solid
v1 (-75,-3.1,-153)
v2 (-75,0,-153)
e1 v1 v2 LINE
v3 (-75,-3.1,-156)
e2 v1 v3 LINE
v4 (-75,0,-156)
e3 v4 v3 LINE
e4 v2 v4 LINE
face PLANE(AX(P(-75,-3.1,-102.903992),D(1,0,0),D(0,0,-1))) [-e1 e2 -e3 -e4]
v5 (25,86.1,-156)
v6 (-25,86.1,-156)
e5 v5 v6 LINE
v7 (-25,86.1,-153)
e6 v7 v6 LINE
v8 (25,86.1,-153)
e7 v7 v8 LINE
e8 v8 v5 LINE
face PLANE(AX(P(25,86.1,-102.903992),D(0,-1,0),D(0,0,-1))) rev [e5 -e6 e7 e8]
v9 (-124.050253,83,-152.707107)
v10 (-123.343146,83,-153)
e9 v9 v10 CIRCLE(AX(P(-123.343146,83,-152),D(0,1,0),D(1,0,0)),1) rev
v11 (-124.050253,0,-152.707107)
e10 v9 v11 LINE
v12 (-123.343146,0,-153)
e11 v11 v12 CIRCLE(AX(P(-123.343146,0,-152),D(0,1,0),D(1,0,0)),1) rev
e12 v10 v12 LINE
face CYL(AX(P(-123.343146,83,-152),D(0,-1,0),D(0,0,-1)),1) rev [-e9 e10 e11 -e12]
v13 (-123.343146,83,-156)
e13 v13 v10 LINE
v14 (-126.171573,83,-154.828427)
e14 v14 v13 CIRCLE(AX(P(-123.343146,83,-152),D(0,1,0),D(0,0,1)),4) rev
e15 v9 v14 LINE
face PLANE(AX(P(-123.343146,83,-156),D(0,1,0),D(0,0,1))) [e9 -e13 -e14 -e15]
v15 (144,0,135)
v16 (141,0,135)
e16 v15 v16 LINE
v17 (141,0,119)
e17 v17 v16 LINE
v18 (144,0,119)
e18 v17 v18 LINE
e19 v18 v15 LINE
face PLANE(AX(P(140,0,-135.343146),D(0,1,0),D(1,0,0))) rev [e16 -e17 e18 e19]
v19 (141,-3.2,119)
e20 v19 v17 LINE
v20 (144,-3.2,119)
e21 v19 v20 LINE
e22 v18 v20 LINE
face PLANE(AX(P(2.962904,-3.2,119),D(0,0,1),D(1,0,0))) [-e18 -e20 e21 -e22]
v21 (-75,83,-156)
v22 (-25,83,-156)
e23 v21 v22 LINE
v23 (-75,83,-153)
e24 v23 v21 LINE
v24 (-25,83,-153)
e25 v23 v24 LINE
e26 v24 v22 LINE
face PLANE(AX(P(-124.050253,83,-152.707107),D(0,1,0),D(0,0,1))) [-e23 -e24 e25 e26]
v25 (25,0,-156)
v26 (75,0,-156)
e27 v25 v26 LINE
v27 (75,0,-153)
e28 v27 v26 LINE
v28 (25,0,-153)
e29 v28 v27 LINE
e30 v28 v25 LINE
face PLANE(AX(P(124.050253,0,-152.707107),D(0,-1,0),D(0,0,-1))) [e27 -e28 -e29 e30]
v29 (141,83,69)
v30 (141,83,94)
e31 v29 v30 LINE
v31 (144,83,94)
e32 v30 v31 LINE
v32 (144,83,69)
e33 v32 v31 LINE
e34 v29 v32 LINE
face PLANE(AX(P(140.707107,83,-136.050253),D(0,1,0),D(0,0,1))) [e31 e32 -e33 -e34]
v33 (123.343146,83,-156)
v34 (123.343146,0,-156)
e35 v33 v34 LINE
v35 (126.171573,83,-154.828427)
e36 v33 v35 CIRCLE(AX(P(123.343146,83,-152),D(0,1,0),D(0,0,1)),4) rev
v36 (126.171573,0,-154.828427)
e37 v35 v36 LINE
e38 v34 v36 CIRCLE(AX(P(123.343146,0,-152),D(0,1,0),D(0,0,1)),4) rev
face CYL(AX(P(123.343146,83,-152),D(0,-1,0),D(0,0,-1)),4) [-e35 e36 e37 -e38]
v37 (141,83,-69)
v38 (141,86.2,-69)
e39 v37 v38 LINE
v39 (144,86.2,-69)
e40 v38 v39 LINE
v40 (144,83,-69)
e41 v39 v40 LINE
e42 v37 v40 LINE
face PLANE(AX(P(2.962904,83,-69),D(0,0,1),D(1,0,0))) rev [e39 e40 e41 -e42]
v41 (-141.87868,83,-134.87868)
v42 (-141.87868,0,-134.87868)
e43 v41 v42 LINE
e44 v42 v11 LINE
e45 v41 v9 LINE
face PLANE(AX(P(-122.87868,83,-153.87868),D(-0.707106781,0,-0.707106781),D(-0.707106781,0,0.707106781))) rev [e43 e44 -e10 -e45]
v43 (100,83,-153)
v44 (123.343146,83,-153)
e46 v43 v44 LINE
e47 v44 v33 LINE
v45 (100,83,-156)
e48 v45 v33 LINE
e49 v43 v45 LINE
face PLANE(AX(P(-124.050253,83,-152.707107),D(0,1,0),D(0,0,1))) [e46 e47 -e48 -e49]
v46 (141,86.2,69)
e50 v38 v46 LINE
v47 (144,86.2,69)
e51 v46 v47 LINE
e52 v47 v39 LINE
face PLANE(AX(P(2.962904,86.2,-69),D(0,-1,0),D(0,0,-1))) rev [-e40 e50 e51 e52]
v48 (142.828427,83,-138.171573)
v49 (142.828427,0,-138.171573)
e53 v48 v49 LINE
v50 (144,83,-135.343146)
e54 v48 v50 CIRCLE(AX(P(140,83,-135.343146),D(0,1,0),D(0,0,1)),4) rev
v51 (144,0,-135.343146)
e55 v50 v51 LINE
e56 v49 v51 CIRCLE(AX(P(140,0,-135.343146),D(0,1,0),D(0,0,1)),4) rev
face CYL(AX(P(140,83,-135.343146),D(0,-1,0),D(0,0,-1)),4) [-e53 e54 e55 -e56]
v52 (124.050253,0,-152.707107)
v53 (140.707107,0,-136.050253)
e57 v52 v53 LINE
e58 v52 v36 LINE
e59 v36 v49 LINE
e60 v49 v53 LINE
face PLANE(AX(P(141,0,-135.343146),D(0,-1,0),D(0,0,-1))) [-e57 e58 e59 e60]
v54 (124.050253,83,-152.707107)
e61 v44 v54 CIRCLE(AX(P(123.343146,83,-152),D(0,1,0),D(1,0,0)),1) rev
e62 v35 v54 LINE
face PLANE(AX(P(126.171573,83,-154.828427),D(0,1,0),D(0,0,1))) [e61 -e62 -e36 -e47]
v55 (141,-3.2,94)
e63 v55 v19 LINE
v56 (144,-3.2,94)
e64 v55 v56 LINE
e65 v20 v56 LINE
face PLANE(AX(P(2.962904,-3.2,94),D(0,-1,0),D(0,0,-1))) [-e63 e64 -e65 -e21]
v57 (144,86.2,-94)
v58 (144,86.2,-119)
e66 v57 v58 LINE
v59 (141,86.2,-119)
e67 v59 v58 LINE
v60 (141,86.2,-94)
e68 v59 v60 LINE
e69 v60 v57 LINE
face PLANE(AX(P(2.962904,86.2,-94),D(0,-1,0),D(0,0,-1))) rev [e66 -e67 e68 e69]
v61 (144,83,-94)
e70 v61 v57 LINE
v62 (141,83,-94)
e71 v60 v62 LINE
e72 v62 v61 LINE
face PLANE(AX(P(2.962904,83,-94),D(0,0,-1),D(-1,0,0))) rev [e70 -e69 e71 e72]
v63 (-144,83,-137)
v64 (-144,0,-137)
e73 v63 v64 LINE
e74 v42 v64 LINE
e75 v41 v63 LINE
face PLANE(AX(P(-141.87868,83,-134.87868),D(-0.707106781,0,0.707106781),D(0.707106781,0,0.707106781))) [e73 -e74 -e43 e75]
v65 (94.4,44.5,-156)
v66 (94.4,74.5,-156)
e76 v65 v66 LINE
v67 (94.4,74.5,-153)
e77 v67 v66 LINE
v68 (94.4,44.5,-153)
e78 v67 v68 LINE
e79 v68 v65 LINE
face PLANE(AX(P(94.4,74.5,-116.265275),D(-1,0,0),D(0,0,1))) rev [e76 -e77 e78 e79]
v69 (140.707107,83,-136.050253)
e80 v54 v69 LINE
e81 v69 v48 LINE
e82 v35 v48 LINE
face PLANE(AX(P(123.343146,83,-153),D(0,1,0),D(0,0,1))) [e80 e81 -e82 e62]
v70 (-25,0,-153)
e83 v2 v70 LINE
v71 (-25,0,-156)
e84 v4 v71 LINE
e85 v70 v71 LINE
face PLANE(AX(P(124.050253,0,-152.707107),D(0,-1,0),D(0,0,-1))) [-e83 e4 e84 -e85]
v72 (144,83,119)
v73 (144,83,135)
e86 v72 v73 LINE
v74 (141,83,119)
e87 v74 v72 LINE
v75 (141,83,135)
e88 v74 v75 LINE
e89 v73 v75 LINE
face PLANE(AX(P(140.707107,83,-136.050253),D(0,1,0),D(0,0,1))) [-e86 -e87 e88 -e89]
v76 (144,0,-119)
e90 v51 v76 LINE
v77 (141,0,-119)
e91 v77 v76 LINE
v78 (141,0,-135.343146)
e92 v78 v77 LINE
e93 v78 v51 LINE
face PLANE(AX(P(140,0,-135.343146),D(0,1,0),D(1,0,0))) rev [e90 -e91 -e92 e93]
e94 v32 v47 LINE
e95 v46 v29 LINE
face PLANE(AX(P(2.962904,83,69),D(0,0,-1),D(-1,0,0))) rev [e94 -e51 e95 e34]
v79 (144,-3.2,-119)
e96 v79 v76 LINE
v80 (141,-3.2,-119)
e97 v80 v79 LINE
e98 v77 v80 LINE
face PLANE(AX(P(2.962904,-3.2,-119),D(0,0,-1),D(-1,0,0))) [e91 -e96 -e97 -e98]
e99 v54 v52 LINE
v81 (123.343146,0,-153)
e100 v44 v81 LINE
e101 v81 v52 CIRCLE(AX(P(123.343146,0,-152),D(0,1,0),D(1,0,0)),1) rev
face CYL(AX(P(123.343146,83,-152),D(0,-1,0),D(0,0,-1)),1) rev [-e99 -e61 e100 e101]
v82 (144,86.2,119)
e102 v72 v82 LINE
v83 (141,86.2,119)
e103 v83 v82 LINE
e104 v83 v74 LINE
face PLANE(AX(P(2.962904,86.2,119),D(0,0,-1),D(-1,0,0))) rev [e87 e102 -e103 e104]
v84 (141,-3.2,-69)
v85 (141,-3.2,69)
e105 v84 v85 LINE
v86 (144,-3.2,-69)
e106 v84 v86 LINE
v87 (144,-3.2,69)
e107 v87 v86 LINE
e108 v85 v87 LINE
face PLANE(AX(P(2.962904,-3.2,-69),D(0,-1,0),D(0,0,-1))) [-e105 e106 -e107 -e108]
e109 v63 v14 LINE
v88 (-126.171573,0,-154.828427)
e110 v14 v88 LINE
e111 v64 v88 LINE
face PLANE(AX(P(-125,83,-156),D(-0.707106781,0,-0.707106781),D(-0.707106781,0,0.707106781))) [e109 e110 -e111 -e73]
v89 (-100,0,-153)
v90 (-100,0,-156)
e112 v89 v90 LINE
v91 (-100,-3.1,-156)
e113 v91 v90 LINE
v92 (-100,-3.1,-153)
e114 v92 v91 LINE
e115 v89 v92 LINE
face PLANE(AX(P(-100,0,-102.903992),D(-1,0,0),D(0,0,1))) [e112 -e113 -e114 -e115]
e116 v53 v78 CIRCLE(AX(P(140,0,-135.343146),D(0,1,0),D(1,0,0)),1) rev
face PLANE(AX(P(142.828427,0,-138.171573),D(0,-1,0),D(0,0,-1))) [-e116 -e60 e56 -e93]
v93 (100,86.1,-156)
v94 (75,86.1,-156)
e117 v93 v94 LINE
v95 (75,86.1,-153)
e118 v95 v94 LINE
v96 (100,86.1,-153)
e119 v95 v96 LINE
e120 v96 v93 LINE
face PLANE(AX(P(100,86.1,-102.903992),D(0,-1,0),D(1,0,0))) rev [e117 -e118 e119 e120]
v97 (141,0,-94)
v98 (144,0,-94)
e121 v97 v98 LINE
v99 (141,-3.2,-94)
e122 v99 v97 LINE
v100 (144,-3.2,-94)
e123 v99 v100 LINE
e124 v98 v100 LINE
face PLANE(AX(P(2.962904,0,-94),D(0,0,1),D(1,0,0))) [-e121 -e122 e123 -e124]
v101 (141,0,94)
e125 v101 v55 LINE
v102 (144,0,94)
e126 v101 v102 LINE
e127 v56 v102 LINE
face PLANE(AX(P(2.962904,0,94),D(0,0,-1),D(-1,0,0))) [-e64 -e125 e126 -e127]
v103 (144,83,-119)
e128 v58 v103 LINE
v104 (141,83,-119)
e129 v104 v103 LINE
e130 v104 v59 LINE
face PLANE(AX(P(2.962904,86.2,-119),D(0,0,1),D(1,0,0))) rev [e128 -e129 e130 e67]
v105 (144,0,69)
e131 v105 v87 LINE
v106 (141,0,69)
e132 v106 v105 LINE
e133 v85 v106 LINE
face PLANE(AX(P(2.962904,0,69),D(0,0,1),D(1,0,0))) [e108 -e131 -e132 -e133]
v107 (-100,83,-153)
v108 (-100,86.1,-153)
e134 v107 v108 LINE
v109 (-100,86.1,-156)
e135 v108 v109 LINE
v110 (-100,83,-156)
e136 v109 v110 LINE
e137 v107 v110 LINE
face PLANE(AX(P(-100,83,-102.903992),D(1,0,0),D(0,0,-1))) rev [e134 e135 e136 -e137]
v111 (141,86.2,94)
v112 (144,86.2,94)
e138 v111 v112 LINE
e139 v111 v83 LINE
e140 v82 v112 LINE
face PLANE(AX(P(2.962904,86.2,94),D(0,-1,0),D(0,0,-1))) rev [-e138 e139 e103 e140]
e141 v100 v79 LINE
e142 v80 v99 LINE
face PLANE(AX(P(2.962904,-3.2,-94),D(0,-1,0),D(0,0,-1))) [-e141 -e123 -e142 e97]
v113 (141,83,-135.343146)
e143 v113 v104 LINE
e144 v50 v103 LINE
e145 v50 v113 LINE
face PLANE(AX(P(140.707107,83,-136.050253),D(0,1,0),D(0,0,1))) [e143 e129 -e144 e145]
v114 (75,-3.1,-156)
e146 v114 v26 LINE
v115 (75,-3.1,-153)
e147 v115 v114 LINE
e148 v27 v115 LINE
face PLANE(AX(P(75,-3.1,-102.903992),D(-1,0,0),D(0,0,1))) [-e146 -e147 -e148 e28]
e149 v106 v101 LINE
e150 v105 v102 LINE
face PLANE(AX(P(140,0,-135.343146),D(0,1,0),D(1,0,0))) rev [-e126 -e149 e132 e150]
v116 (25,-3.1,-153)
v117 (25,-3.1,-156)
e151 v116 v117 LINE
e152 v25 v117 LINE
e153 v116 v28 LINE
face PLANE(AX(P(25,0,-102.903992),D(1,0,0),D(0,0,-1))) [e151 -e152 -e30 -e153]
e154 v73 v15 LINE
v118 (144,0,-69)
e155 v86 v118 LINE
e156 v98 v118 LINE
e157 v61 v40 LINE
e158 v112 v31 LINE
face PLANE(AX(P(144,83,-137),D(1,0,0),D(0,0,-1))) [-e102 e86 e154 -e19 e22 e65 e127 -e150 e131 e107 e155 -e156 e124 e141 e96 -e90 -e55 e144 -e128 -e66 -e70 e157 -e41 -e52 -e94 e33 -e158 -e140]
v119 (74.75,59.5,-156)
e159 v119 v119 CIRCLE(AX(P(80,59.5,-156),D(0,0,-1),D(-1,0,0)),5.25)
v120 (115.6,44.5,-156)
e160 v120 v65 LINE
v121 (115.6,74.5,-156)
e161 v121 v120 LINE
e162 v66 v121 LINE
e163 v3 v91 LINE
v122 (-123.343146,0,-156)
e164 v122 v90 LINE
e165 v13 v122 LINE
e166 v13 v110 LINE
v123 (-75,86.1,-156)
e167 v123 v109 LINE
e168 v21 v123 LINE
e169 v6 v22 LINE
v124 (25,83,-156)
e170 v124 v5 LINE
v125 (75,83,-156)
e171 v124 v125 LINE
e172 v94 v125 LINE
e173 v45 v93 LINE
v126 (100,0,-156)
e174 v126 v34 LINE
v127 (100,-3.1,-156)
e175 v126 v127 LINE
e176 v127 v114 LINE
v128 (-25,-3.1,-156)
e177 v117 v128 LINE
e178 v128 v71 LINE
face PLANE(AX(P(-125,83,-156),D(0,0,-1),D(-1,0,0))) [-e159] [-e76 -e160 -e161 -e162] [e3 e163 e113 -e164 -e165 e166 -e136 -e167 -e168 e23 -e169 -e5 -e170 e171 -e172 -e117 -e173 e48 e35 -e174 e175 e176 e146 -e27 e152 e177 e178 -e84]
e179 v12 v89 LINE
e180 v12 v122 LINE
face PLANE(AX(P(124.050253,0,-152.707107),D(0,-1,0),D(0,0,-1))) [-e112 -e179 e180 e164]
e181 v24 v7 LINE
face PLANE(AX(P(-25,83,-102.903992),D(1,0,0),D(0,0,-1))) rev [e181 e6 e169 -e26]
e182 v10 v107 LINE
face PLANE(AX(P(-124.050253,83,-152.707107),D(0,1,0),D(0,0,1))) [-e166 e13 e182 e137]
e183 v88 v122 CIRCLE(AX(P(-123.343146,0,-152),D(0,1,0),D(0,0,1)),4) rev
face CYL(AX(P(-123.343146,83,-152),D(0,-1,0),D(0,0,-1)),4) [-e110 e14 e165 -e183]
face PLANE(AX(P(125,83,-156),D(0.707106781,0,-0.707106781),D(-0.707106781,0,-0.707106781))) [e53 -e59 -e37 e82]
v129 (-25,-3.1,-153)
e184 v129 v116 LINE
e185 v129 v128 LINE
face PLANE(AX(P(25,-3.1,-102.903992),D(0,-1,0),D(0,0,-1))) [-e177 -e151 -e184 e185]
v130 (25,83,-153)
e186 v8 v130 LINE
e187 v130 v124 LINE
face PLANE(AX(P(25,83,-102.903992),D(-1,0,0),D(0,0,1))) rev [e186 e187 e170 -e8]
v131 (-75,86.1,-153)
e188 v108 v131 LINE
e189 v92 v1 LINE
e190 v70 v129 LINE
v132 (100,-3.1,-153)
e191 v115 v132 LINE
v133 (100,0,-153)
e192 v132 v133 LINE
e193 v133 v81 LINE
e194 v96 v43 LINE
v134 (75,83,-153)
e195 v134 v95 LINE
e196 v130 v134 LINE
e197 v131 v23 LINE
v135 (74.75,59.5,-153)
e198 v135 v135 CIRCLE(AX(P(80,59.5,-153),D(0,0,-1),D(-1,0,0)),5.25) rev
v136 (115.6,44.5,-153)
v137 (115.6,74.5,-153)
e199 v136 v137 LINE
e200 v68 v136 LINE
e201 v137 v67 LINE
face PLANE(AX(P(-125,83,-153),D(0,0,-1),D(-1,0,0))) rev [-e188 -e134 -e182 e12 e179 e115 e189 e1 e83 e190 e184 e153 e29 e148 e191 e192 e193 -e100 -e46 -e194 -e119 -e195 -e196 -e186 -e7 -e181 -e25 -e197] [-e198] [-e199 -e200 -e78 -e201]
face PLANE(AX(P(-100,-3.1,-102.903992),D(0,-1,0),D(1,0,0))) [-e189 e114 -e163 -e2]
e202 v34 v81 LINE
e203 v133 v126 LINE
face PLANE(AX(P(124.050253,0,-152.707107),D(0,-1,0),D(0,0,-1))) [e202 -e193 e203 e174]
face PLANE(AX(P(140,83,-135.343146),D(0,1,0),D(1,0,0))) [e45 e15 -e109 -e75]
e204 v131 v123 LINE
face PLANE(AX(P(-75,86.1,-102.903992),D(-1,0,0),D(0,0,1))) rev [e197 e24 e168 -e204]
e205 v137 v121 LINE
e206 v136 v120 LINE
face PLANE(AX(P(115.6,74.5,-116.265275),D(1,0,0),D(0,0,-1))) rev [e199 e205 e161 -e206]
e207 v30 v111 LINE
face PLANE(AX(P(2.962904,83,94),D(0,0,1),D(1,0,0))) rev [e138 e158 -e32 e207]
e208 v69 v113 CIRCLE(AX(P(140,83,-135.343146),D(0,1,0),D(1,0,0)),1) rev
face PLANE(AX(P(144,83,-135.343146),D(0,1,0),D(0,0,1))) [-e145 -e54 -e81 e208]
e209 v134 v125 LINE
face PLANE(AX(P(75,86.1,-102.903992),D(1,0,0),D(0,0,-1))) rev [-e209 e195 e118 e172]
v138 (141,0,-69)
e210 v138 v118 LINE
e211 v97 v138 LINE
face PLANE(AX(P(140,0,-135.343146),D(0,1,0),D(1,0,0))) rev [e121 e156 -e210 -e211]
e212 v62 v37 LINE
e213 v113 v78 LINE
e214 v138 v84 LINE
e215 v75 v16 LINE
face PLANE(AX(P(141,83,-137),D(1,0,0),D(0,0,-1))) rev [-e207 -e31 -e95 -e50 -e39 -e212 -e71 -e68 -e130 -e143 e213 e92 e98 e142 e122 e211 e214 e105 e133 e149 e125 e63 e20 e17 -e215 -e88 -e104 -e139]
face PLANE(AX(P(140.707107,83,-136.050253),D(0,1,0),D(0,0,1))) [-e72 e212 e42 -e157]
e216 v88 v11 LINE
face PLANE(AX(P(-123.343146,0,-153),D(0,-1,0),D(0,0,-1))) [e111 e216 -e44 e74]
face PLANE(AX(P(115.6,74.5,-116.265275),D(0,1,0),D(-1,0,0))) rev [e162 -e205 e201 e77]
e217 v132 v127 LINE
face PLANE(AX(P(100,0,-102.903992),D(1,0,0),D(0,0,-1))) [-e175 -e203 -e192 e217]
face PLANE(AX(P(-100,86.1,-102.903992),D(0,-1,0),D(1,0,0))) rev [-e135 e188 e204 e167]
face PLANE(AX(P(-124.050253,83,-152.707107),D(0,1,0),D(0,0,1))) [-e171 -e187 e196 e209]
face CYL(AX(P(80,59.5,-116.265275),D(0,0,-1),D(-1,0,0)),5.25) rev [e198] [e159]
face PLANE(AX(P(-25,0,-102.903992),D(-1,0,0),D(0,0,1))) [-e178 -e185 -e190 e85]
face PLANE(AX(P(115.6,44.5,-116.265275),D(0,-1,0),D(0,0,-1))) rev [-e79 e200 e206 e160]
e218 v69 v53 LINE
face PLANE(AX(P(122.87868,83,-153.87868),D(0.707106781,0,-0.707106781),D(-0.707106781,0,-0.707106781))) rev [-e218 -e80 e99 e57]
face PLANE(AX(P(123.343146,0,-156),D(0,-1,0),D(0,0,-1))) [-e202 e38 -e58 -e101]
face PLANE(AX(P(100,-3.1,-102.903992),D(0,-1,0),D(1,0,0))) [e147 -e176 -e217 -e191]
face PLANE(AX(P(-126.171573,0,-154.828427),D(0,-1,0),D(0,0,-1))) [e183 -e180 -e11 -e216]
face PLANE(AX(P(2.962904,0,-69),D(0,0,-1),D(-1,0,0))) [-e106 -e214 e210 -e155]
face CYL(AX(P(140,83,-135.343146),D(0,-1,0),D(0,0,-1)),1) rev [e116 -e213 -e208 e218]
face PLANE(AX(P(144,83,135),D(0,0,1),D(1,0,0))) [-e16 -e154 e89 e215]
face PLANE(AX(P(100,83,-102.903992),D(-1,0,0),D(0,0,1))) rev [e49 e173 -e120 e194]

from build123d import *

# Parameters (mm, degrees)
BASE_FLANGE1_DEPTH  = 83
SKETCH2_W           = 50
SKETCH2_H           = 3.1
SKETCH2_W_2         = 25
BOSS_EXTRUDE1_DEPTH = 3
SKETCH3_W           = 138
SKETCH3_H           = 3.2
SKETCH3_W_2         = 25
BOSS_EXTRUDE2_DEPTH = 3
CUT_EXTRUDE1_REACH  = 337.928
SKETCH4_R           = 5.25
SKETCH4_W           = 21.2
SKETCH4_H           = 30


# Sheet-metal steps are written as plain solids
with BuildPart() as part:
    # Sketch1 → Base-Flange1 (new body)
    with BuildSketch(Plane(origin=(0, 0, 0), x_dir=(1, 0, 0), z_dir=(0, 1, 0))):
        with BuildLine():
            Line((-144, 137), (-126.171572875, 154.828427125))
            ThreePointArc((-126.171572875, 154.828427125), (-124.87387948, 155.69551813), (-123.343145751, 156))
            Line((-123.343145751, 156), (123.343145751, 156))
            ThreePointArc((123.343145751, 156), (124.87387948, 155.69551813), (126.171572875, 154.828427125))
            Line((126.171572875, 154.828427125), (142.828427125, 138.171572875))
            ThreePointArc((142.828427125, 138.171572875), (143.69551813, 136.87387948), (144, 135.343145751))
            Line((144, 135.343145751), (144, -135))
            Line((144, -135), (141, -135))
            Line((141, -135), (141, 135.343145751))
            ThreePointArc((141, 135.343145751), (140.923879533, 135.725829183), (140.707106781, 136.050252532))
            Line((140.707106781, 136.050252532), (124.050252532, 152.707106781))
            ThreePointArc((124.050252532, 152.707106781), (123.725829183, 152.923879533), (123.343145751, 153))
            Line((123.343145751, 153), (-123.343145751, 153))
            ThreePointArc((-123.343145751, 153), (-123.725829183, 152.923879533), (-124.050252532, 152.707106781))
            Line((-124.050252532, 152.707106781), (-141.878679656, 134.878679656))
            Line((-141.878679656, 134.878679656), (-144, 137))
        make_face()
    extrude(amount=BASE_FLANGE1_DEPTH)

    # Sketch2 → Boss-Extrude1 (add)
    with BuildSketch(Plane(origin=(0, 0, -156), x_dir=(-1, 0, 0), z_dir=(0, 0, -1))):
        with Locations((0, -1.55)):
            Rectangle(SKETCH2_W, SKETCH2_H)
        with Locations((-87.5, -1.55)):
            Rectangle(SKETCH2_W_2, SKETCH2_H)
        with Locations((87.5, -1.55)):
            Rectangle(SKETCH2_W_2, SKETCH2_H)
    boss_extrude1 = extrude(amount=-BOSS_EXTRUDE1_DEPTH)

    # Sketch3 → Boss-Extrude2 (add)
    with BuildSketch(Plane(origin=(144, 0, 0), x_dir=(0, 0, -1), z_dir=(1, 0, 0))):
        with Locations((0, -1.6)):
            Rectangle(SKETCH3_W, SKETCH3_H)
        with Locations((106.5, -1.6)):
            Rectangle(SKETCH3_W_2, SKETCH3_H)
        with Locations((-106.5, -1.6)):
            Rectangle(SKETCH3_W_2, SKETCH3_H)
    boss_extrude2 = extrude(amount=-BOSS_EXTRUDE2_DEPTH)

    # Mirror1: Boss-Extrude1, Boss-Extrude2 across plane
    add(boss_extrude1.mirror(Plane.ZX.offset(41.5)))
    add(boss_extrude2.mirror(Plane.ZX.offset(41.5)))

    # Sketch4 → Cut-Extrude1 (cut, up to next)
    with BuildSketch(Plane(origin=(0, 0, -156), x_dir=(-1, 0, 0), z_dir=(0, 0, -1)), mode=Mode.PRIVATE) as cut_extrude1_sk1:
        with Locations((-80, 59.5)):
            Circle(SKETCH4_R)
    cut_extrude1_tool1 = extrude(cut_extrude1_sk1.sketch, amount=-CUT_EXTRUDE1_REACH, mode=Mode.PRIVATE) & part.part
    # Sketch4 → Cut-Extrude1 (cut, up to next)
    with BuildSketch(Plane(origin=(0, 0, -156), x_dir=(-1, 0, 0), z_dir=(0, 0, -1)), mode=Mode.PRIVATE) as cut_extrude1_sk2:
        with Locations((-105, 59.5)):
            Rectangle(SKETCH4_W, SKETCH4_H)
    cut_extrude1_tool2 = extrude(cut_extrude1_sk2.sketch, amount=-CUT_EXTRUDE1_REACH, mode=Mode.PRIVATE) & part.part
    add(cut_extrude1_tool1.solids().sort_by_distance((80, 59.5, -156))[0], mode=Mode.SUBTRACT)
    add(cut_extrude1_tool2.solids().sort_by_distance((105, 59.5, -156))[0], mode=Mode.SUBTRACT)


solid = part.part
